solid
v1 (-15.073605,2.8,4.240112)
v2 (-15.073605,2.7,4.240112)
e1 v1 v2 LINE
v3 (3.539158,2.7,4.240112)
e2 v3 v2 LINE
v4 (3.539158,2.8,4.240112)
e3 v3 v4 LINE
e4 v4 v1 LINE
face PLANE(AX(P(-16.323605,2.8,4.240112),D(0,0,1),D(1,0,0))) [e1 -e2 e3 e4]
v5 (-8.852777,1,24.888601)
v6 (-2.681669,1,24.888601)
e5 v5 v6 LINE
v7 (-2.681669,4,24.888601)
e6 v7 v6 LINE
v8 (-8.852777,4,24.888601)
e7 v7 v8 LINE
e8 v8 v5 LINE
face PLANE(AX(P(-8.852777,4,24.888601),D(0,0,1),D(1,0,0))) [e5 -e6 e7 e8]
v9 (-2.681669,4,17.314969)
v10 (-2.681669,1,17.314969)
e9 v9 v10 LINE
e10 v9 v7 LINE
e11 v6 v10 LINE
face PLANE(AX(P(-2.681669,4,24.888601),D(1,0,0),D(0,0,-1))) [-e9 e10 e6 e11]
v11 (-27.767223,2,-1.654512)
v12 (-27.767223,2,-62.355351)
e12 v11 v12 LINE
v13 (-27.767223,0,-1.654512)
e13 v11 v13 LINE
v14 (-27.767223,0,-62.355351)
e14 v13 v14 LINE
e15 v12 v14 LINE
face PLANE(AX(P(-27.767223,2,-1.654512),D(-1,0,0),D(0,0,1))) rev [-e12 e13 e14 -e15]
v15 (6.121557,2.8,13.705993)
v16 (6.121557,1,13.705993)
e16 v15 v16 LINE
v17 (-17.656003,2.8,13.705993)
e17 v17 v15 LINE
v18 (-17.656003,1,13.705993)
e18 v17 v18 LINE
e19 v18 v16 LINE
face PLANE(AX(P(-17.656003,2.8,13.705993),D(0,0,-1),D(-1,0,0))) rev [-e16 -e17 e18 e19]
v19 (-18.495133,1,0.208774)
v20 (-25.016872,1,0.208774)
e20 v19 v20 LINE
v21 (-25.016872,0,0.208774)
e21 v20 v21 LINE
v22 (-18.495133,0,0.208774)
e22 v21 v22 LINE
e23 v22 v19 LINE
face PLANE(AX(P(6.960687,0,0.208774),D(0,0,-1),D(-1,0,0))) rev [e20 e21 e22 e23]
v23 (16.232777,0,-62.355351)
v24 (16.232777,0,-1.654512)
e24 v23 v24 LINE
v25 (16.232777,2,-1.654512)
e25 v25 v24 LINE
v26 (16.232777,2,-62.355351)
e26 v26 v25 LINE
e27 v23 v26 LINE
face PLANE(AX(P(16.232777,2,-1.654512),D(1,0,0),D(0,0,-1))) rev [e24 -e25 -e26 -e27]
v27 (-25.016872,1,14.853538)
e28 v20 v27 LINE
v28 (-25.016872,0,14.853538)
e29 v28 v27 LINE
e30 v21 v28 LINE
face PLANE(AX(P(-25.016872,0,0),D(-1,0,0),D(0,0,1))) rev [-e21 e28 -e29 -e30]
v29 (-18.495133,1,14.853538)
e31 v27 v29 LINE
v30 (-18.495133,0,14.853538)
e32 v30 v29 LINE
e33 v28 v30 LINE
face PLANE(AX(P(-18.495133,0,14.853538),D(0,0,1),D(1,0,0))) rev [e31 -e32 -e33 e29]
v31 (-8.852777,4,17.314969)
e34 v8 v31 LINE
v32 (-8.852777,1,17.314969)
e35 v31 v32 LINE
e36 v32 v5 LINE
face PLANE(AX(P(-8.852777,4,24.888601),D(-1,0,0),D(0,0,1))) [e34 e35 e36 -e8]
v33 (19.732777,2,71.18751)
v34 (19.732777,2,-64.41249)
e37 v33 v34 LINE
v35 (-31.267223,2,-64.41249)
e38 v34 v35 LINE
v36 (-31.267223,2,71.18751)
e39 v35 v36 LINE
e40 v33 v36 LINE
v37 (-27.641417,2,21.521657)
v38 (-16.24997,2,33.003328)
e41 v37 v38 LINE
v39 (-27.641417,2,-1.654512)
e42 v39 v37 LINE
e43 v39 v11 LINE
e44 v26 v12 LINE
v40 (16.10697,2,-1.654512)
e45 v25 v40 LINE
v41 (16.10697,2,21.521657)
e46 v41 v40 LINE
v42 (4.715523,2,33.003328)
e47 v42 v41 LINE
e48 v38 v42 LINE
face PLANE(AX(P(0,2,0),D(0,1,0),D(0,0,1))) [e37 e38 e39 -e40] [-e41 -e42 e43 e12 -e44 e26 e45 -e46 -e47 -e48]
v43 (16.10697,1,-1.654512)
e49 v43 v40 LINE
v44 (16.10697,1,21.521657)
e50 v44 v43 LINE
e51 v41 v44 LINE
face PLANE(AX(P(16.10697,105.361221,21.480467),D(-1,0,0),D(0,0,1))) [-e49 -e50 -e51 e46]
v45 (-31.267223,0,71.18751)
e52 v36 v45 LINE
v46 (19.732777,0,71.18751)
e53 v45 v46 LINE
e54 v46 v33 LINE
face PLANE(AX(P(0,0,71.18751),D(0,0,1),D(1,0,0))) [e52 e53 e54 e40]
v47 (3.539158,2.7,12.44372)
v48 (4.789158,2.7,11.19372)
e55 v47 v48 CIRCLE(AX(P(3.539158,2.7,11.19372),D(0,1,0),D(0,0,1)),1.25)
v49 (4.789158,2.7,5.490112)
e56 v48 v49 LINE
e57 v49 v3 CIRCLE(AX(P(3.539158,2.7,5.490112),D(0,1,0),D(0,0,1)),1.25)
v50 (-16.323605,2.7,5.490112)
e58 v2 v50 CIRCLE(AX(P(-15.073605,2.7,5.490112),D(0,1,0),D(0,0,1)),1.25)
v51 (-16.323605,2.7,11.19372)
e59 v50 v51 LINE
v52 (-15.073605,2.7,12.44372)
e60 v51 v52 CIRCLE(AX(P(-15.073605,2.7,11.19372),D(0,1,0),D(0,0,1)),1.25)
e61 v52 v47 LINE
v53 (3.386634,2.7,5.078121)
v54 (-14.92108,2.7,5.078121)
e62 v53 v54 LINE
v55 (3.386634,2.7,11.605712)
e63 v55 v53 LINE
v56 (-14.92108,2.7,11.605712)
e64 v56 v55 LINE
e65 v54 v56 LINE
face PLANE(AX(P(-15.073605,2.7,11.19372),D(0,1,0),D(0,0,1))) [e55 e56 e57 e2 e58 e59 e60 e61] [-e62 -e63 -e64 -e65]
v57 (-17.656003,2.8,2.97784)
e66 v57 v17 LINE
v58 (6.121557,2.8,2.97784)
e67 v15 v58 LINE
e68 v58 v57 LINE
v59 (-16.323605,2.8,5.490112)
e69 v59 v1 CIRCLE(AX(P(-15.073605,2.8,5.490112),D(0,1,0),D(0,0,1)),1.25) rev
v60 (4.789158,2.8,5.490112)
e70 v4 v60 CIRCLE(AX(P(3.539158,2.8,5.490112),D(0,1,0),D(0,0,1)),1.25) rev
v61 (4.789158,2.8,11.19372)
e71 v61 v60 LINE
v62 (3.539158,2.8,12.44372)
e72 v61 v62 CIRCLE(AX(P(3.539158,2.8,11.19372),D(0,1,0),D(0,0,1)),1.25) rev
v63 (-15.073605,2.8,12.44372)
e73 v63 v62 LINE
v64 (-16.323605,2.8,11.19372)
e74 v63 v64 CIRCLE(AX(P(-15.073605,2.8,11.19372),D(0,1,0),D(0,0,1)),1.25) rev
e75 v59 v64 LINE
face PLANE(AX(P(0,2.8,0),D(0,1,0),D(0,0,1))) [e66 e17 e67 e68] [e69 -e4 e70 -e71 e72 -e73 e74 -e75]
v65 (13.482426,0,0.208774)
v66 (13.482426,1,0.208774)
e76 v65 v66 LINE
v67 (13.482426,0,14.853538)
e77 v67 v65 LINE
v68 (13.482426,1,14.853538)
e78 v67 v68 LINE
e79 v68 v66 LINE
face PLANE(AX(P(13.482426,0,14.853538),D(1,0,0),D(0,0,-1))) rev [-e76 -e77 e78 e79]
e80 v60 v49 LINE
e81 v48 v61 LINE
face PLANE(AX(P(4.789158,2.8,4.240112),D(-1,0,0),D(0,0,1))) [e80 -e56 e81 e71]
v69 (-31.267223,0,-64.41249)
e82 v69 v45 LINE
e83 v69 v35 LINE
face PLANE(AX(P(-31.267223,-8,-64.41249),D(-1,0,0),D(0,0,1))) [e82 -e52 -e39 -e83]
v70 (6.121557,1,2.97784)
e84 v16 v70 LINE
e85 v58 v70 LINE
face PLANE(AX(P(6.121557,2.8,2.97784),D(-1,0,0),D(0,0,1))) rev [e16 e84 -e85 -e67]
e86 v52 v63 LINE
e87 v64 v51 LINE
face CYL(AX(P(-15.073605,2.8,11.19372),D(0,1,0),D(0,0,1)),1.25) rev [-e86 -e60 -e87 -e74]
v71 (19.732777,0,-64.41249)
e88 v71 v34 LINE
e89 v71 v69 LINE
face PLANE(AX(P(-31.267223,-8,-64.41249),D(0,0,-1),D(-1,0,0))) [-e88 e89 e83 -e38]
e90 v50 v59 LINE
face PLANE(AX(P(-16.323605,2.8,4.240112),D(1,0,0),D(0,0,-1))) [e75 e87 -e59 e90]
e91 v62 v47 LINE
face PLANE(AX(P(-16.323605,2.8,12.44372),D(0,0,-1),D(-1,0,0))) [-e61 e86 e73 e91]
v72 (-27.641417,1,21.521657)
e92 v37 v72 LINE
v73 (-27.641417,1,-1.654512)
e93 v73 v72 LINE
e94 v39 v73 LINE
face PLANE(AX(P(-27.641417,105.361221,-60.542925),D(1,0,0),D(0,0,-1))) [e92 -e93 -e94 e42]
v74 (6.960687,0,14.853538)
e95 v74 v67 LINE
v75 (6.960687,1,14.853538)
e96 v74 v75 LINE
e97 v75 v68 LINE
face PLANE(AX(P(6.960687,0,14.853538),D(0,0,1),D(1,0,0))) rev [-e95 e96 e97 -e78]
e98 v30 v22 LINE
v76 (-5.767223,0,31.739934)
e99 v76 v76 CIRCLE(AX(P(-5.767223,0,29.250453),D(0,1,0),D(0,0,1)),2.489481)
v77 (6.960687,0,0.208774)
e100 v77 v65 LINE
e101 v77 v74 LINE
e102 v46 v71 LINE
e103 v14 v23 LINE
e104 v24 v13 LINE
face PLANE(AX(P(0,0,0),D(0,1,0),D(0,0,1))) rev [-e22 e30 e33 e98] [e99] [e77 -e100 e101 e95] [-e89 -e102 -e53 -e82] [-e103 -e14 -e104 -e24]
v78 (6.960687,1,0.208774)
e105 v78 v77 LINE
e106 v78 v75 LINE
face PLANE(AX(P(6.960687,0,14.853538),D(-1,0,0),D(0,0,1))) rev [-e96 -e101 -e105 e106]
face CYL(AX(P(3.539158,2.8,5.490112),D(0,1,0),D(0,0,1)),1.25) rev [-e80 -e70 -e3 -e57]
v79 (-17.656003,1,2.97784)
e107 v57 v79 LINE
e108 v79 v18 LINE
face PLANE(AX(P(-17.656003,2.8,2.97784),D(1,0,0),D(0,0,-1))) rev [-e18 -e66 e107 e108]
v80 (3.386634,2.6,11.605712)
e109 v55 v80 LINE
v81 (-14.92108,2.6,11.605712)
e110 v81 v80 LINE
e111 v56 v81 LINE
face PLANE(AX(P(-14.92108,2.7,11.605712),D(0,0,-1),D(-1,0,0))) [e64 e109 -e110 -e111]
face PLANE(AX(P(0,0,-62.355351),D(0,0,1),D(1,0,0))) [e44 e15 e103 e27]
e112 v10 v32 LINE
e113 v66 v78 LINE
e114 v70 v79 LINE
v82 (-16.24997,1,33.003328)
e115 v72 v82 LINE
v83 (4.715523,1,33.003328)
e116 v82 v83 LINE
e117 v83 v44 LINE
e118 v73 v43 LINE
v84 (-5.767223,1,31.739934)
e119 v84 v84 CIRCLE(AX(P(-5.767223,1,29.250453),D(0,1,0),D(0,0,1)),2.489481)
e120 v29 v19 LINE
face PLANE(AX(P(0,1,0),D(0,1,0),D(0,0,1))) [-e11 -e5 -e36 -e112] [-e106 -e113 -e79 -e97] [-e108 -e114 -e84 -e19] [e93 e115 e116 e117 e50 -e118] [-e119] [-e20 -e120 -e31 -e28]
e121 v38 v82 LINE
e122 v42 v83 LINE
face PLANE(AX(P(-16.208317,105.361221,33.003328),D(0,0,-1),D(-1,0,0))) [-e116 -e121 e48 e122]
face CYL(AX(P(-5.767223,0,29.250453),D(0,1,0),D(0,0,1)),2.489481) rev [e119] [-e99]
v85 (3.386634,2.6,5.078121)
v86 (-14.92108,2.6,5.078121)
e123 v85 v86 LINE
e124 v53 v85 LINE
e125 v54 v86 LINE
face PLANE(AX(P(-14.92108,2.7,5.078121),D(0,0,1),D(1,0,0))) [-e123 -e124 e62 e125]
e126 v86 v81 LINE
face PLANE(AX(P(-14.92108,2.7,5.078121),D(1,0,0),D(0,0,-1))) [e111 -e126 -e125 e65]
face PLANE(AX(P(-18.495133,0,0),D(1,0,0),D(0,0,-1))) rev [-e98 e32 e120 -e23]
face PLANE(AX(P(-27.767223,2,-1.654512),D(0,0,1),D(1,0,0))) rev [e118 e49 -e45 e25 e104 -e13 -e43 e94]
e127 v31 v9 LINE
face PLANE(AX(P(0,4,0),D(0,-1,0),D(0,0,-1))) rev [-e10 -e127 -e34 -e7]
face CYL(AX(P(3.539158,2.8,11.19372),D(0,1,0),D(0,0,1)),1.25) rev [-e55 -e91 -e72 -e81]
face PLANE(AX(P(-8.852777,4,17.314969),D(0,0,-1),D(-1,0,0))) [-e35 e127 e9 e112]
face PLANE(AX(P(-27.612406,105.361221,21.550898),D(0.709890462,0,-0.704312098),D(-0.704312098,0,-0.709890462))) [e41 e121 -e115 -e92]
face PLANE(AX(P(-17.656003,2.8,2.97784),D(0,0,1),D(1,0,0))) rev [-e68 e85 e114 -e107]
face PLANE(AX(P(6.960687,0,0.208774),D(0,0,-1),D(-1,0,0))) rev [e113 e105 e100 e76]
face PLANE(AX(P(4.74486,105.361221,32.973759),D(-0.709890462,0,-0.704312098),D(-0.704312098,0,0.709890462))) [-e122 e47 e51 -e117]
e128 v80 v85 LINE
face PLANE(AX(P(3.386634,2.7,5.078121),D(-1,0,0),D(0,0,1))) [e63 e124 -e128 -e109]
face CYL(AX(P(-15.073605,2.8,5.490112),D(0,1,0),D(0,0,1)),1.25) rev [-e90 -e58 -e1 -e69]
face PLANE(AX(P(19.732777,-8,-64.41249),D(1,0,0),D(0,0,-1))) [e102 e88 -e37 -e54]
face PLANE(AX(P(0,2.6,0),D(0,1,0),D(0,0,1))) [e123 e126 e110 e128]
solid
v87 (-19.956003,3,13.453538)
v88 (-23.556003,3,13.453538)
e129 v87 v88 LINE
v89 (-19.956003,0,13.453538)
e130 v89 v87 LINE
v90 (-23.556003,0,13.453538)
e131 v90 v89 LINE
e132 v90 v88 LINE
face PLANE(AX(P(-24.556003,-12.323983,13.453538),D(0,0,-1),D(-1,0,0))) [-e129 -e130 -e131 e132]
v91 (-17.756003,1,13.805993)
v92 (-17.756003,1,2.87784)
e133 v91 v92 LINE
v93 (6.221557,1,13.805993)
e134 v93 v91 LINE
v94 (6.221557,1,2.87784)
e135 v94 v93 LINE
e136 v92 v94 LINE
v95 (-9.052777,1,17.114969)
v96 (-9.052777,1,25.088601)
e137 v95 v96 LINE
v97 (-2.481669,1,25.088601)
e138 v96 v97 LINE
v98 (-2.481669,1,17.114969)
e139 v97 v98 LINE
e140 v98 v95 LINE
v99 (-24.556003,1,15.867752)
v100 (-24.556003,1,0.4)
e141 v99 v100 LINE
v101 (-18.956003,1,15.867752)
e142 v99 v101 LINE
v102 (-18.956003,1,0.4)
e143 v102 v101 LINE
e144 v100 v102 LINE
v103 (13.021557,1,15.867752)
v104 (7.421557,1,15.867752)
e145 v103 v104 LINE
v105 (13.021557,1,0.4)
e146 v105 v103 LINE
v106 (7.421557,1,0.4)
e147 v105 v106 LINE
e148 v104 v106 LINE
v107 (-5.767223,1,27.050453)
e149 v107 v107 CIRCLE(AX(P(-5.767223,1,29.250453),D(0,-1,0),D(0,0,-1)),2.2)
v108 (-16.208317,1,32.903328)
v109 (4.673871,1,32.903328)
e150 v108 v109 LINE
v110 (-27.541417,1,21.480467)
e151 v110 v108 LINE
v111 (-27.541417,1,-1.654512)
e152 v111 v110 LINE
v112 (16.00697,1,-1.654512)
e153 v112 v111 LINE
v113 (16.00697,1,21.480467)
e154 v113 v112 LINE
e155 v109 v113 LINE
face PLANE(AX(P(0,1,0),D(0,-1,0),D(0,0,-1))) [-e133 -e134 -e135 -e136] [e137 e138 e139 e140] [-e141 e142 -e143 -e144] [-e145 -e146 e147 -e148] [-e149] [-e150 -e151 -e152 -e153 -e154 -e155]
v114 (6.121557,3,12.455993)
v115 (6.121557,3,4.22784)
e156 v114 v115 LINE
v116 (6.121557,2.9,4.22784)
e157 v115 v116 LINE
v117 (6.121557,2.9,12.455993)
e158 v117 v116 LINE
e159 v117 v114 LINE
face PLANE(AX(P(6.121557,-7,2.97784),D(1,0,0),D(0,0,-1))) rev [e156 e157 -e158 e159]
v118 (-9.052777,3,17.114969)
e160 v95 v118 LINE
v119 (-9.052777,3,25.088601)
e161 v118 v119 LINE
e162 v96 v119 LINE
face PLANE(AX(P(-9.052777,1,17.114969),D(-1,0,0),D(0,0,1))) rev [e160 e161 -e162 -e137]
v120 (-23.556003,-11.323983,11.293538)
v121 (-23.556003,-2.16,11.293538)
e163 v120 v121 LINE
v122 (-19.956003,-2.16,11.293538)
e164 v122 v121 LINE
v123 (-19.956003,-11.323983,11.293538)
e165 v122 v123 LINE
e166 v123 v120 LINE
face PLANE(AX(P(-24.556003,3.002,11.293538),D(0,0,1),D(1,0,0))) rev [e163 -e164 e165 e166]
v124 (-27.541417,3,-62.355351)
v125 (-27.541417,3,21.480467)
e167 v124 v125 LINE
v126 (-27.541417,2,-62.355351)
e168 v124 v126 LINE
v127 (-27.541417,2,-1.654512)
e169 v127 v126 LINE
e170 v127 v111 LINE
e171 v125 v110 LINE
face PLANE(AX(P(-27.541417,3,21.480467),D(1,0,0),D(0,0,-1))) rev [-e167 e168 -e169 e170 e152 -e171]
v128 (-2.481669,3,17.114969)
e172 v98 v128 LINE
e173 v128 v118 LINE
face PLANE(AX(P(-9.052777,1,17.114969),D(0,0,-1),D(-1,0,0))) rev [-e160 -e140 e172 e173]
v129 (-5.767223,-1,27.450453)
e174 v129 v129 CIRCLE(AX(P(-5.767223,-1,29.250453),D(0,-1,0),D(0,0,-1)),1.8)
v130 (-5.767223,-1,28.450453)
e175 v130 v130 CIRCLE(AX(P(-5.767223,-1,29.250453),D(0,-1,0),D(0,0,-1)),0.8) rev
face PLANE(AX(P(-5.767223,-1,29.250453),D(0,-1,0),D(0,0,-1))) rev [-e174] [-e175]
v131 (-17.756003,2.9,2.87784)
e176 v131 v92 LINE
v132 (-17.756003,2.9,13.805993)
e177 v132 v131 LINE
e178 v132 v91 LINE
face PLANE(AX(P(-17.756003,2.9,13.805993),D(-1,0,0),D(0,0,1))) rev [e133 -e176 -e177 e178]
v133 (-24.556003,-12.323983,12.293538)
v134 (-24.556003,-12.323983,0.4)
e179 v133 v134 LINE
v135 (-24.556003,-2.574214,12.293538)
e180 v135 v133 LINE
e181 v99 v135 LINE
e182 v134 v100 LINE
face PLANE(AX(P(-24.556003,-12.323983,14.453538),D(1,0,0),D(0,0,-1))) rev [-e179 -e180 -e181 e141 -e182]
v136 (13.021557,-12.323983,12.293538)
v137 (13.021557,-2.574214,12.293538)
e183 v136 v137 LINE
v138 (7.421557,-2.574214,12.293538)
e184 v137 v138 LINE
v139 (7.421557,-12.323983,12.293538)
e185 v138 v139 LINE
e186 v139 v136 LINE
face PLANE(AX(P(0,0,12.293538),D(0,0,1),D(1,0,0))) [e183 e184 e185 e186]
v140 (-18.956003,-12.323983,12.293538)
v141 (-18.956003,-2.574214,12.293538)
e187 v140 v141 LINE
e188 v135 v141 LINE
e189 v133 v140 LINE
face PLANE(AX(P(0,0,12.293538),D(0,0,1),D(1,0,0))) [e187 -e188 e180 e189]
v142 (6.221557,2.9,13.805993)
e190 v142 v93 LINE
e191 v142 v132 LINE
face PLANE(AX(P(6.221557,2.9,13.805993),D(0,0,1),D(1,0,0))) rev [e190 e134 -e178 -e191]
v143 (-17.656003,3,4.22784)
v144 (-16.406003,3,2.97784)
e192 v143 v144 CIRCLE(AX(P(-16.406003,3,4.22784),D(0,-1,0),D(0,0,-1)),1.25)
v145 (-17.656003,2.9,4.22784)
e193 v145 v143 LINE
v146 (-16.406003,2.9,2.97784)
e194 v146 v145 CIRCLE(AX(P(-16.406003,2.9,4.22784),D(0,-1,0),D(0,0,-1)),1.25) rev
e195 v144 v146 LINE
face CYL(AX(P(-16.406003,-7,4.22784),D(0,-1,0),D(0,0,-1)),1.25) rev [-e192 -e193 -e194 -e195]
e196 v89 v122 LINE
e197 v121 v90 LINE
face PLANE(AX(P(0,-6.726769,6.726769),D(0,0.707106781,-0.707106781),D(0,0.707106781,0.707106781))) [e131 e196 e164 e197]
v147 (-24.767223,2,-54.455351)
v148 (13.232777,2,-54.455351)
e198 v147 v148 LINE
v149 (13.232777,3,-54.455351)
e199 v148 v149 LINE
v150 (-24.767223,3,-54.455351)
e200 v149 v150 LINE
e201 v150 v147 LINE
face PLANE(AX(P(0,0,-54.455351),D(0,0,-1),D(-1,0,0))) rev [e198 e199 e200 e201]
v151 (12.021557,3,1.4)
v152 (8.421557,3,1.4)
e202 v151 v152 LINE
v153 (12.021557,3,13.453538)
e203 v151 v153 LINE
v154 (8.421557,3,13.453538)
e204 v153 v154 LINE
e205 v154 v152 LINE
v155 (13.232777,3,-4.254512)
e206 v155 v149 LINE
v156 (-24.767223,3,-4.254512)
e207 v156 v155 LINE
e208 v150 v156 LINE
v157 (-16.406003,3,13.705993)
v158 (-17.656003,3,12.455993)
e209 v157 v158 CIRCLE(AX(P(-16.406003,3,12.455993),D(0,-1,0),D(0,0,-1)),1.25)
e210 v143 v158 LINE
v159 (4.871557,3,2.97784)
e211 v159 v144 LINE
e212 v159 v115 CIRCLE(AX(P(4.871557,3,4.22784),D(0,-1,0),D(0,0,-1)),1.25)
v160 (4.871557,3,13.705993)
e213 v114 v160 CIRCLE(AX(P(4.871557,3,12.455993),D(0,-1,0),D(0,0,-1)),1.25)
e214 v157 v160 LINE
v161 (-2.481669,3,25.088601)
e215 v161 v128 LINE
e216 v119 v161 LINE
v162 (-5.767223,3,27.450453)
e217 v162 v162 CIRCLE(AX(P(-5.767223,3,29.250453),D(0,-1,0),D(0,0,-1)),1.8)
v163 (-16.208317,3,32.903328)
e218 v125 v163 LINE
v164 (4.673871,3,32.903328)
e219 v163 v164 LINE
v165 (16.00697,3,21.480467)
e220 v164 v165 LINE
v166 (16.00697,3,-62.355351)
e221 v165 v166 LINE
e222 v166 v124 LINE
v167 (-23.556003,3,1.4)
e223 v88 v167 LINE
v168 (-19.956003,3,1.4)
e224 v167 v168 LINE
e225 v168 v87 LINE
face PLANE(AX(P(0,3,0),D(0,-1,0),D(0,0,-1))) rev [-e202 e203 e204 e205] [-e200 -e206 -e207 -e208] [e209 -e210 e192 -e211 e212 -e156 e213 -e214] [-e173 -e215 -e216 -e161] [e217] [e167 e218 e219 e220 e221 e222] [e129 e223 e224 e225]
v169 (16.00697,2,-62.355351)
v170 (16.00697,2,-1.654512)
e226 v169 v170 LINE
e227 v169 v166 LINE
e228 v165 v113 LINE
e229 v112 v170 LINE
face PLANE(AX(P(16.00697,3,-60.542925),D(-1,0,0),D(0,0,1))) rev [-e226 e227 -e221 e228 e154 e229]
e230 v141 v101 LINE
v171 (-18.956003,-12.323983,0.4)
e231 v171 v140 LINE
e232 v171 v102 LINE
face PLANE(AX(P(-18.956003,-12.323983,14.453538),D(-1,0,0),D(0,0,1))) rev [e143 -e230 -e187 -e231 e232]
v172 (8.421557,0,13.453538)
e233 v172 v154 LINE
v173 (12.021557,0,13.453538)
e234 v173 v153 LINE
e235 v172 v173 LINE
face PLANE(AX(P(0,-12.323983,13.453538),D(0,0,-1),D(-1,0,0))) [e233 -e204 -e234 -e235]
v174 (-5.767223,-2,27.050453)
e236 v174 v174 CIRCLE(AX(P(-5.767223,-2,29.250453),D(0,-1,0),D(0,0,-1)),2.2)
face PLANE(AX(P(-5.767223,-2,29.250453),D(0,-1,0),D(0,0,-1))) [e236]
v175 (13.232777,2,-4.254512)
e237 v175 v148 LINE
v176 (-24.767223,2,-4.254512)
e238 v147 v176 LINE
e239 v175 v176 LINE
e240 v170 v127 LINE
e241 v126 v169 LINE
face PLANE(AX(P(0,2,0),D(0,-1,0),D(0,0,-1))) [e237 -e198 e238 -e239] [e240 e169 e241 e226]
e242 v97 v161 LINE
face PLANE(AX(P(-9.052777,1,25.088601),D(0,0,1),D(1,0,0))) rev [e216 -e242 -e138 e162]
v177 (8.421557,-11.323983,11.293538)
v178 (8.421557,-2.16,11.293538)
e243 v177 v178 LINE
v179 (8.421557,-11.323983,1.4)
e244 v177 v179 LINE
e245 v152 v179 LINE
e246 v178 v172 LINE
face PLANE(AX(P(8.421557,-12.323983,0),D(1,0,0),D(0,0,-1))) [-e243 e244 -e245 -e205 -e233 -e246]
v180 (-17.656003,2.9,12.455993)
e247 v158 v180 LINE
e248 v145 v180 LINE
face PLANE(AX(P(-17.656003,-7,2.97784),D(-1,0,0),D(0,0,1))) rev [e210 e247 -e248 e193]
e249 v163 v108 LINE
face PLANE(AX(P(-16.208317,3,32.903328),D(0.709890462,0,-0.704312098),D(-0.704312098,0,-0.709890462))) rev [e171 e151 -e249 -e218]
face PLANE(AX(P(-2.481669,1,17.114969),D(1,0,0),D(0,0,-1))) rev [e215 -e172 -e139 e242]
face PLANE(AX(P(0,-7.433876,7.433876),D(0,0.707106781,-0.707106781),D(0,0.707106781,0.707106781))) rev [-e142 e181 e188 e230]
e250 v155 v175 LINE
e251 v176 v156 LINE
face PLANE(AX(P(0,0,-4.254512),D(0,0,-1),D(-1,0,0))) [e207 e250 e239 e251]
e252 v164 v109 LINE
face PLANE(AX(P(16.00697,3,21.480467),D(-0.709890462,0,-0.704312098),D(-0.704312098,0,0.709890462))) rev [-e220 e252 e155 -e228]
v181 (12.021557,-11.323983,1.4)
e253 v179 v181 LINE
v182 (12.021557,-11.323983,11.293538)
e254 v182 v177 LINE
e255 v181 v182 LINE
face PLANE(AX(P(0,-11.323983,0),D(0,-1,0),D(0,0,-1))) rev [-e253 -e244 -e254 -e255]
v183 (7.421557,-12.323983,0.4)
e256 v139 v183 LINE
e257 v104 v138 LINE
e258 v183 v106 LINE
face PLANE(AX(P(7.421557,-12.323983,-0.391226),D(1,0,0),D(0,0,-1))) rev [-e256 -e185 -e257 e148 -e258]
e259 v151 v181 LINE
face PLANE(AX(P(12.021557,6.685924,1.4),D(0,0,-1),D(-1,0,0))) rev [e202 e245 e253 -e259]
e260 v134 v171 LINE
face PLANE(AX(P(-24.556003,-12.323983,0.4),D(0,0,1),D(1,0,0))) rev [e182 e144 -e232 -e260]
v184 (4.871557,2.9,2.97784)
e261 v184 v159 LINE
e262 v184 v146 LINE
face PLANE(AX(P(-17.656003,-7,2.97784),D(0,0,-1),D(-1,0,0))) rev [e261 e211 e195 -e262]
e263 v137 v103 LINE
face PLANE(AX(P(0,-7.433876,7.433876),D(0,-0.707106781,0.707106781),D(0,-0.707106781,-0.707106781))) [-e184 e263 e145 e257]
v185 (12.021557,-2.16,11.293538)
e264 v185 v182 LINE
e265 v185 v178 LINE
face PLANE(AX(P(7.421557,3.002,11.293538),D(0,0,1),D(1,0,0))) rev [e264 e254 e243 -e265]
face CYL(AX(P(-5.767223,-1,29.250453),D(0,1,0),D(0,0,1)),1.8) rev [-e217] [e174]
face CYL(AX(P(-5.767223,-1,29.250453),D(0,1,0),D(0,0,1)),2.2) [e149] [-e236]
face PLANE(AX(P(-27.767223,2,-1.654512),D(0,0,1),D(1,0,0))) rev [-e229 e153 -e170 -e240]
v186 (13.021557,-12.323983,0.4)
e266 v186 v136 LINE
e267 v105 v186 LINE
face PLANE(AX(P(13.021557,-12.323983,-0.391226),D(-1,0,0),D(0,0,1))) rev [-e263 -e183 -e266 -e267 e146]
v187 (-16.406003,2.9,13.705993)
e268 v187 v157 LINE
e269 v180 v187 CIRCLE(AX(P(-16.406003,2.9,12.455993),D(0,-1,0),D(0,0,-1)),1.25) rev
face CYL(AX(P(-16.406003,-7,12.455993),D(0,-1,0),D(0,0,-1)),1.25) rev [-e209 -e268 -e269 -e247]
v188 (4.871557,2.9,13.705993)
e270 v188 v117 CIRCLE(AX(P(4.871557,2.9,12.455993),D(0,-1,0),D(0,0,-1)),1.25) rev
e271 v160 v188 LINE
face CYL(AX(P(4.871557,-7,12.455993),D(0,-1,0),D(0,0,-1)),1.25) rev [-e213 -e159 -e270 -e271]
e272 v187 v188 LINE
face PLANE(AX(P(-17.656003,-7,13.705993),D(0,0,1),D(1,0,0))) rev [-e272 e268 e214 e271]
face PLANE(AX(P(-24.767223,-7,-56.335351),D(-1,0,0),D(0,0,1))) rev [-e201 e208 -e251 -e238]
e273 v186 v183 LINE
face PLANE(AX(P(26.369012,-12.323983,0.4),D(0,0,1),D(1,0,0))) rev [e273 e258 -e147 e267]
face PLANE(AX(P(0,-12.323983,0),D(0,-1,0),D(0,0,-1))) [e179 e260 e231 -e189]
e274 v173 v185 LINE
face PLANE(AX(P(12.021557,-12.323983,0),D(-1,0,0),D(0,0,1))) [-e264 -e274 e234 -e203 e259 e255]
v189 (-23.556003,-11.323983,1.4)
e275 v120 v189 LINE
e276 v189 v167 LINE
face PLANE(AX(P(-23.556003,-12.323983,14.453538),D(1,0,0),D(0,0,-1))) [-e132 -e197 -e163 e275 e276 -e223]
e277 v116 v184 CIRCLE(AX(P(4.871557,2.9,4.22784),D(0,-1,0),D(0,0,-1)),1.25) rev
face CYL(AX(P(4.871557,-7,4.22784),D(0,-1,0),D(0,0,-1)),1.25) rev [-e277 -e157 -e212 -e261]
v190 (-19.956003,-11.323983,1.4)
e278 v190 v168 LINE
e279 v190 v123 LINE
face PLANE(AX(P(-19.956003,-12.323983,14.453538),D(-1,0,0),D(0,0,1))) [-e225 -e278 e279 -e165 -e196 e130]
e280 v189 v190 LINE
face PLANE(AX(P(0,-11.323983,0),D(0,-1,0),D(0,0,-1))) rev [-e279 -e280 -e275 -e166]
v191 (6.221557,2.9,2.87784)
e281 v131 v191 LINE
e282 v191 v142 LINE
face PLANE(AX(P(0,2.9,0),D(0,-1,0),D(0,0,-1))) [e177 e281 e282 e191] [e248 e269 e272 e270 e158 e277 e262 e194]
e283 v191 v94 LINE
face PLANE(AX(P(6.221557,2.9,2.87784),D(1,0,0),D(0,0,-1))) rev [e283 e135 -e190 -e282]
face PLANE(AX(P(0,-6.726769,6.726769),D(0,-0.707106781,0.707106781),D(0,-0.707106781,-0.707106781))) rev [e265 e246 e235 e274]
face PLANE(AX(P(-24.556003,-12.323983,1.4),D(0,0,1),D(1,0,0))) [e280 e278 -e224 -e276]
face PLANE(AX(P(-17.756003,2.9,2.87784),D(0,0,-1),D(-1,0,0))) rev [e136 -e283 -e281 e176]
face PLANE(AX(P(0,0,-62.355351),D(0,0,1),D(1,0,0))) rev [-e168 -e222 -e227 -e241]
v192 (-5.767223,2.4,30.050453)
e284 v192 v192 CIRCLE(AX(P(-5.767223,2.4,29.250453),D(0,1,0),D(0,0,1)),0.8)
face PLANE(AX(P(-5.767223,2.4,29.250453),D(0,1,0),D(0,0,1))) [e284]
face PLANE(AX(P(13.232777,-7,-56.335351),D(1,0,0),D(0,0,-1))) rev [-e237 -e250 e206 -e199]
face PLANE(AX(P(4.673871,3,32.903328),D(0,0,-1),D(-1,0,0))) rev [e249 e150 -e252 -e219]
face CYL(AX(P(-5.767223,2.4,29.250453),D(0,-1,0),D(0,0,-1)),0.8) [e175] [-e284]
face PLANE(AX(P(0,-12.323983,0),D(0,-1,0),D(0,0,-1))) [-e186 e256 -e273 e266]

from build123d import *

# Parameters (mm, degrees)
SKETCH1_W                   = 51.332398317
SKETCH1_H                   = 136.325385694
BOSS_EXTRUDE1_DEPTH         = 2
CUT_EXTRUDE1_DEPTH          = 1
SKETCH3_W                   = 26.718092566
SKETCH3_H                   = 51.160838605
CUT_EXTRUDE2_DEPTH          = 1
SKETCH4_W                   = 20.659186536
SKETCH4_H                   = 13.604488078
BOSS_EXTRUDE2_DEPTH         = 1
SKETCH5_W                   = 6.521739131
SKETCH5_H                   = 14.853538096
SKETCH5_W_2                 = 6.52173913
SKETCH5_H_2                 = 15.644764374
CUT_EXTRUDE3_DEPTH          = 1
SKETCH6_W                   = 6.171107994
SKETCH6_H                   = 7.573632539
CUT_EXTRUDE4_DEPTH          = 1
SKETCH7_R                   = 2.489481066
CUT_EXTRUDE5_DEPTH          = 1
BOSS_EXTRUDE3_DEPTH         = 1
SKETCH10_W                  = 6.171107994
SKETCH10_H                  = 7.573632539
BOSS_EXTRUDE4_DEPTH         = 4
BOSS_EXTRUDE5_DEPTH         = 2
SKETCH12_W                  = 6.571107994
SKETCH12_H                  = 7.973632539
CUT_EXTRUDE6_DEPTH          = 2
SKETCH13_R                  = 1.8
SKETCH13_W                  = 26.718092566
SKETCH13_H                  = 51.160838605
CUT_EXTRUDE9_DEPTH          = 2
SKETCH14_R                  = 2.2
SKETCH14_R_2                = 1.8
BOSS_EXTRUDE11_DEPTH        = 2
SKETCH17_R                  = 2.2
BOSS_EXTRUDE12_DEPTH        = 1
SKETCH18_R                  = 0.8
BOSS_EXTRUDE15_DEPTH        = 3.4
EXTRUDE_THIN3_OUTLINE_W     = 5.6
EXTRUDE_THIN3_OUTLINE_H     = 14.844764374
EXTRUDE_THIN3_OUTLINE_W_2   = 3.6
EXTRUDE_THIN3_OUTLINE_H_2   = 12.844764374
EXTRUDE_THIN3_DEPTH         = 13.32398317
EXTRUDE_THIN3_2_OUTLINE_W   = 5.6
EXTRUDE_THIN3_2_OUTLINE_H   = 14.053538096
EXTRUDE_THIN3_2_OUTLINE_W_2 = 3.6
EXTRUDE_THIN3_2_OUTLINE_H_2 = 12.053538096
EXTRUDE_THIN3_2_DEPTH       = 13.32398317
SKETCH26_W                  = 3.6
SKETCH26_H                  = 12.053538096
SKETCH26_H_2                = 12.844764374
CUT_EXTRUDE12_DEPTH         = 13.32398317
SKETCH27_W                  = 5.6
SKETCH27_H                  = 14.053538096
BOSS_EXTRUDE18_DEPTH        = 1
SKETCH27_W_2                = 5.570395019
SKETCH27_H_2                = 14.844764374
BOSS_EXTRUDE18_2_DEPTH      = 1
SKETCH28_W                  = 20.659186536
SKETCH28_H                  = 13.604488078
CUT_EXTRUDE13_DEPTH         = 1
SKETCH29_W                  = 23.777559608
SKETCH29_H                  = 10.728152402
CUT_EXTRUDE15_DEPTH         = 10
SKETCH30_W                  = 23.777559608
SKETCH30_H                  = 10.728152402
SKETCH30_W_2                = 21.112762974
SKETCH30_H_2                = 8.203608222
BOSS_EXTRUDE20_DEPTH        = 1.8
SKETCH31_W                  = 21.112762974
SKETCH31_H                  = 8.203608222
BOSS_EXTRUDE21_DEPTH        = 1.6
SKETCH35_W                  = 23.977559608
SKETCH35_H                  = 10.928152402
CUT_EXTRUDE21_DEPTH         = 1.9
FILLET2_R                   = 1.25
FILLET3_R                   = 1.25
SKETCH37_W                  = 18.307713885
SKETCH37_H                  = 6.527591392
CUT_EXTRUDE22_DEPTH         = 0.1
SKETCH41_W                  = 18.307713885
SKETCH41_H                  = 6.527591392
BOSS_EXTRUDE27_DEPTH        = 0.1
SKETCH43_W                  = 18.307713885
SKETCH43_H                  = 6.527591392
BOSS_EXTRUDE28_DEPTH        = 0.1
CUT_EXTRUDE24_DEPTH         = 40.1
SKETCH51_W                  = 5.6
SKETCH51_H                  = 4.468914857
BOSS_EXTRUDE29_DEPTH        = 1
BOSS_EXTRUDE29_2_DEPTH      = 1
SKETCH52_W                  = 5.6
SKETCH52_H                  = 1
BOSS_EXTRUDE30_DEPTH        = 2.5
BOSS_EXTRUDE30_2_DEPTH      = 2.5
SKETCH53_W                  = 5.6
SKETCH53_H                  = 1
BOSS_EXTRUDE31_DEPTH        = 1
BOSS_EXTRUDE32_START        = 7.421556697
BOSS_EXTRUDE32_DEPTH        = 5.6
BOSS_EXTRUDE32_START_2      = -24.556002911
BOSS_EXTRUDE32_2_DEPTH      = 5.6
SKETCH55_W                  = 3.6
SKETCH55_H                  = 0.791226278
BOSS_EXTRUDE33_DEPTH        = 14.323983
SKETCH56_W                  = 0.791226278
SKETCH56_H                  = 13.32398317
CUT_EXTRUDE25_DEPTH         = 5.6
CUT_EXTRUDE_THIN1_DEPTH     = 1
SKETCH59_W                  = 71.33
SKETCH59_H                  = 156.33
SKETCH59_W_2                = 51.33
SKETCH59_H_2                = 136.33
CUT_EXTRUDE_THIN2_DEPTH     = 10
SKETCH60_W                  = 71
SKETCH60_H                  = 156
SKETCH60_W_2                = 51
SKETCH60_H_2                = 136
CUT_EXTRUDE_THIN3_DEPTH     = 10
SKETCH61_W                  = 51
SKETCH61_H                  = 2
CUT_EXTRUDE26_DEPTH         = 0.4
SKETCH62_W                  = 38
SKETCH62_H                  = 51.160838605
CUT_EXTRUDE28_DEPTH         = 10
SKETCH64_W                  = 38
SKETCH64_H                  = 0.08
BOSS_EXTRUDE35_DEPTH        = 2
SKETCH65_W                  = 38
SKETCH65_H                  = 0.08
BOSS_EXTRUDE37_DEPTH        = 1
SKETCH67_W                  = 44
SKETCH67_H                  = 61.400838605
CUT_EXTRUDE31_DEPTH         = 2
SKETCH69_W                  = 40.716981818
SKETCH69_H                  = 1
BOSS_EXTRUDE39_DEPTH        = 1.863286117
SKETCH70_W                  = 44
SKETCH70_H                  = 2
BOSS_EXTRUDE40_DEPTH        = 1
SKETCH71_W                  = 38
SKETCH71_H                  = 1
CUT_EXTRUDE32_DEPTH         = 1
SKETCH72_W                  = 38
SKETCH72_H                  = 1
BOSS_EXTRUDE41_DEPTH        = 1.8
SKETCH73_W                  = 44
SKETCH73_H                  = 2
CUT_EXTRUDE33_DEPTH         = 0.3
SKETCH74_W                  = 43.548387097
SKETCH74_H                  = 1
BOSS_EXTRUDE43_DEPTH        = 1.812426367


with BuildPart() as part:
    # Sketch1 → Boss-Extrude1 (new body)
    with BuildSketch(Plane(origin=(0, 0, 0), x_dir=(1, 0, 0), z_dir=(0, 1, 0))):
        with Locations((-5.767223106, -3.58751015)):
            Rectangle(SKETCH1_W, SKETCH1_H)
    extrude(amount=BOSS_EXTRUDE1_DEPTH)

    # Sketch2 → Cut-Extrude1 (cut)
    with BuildSketch(Plane(origin=(0, 2, 0), x_dir=(1, 0, 0), z_dir=(0, 1, 0))):
        Polygon((-27.541416655, -30.445855171), (-27.541416655, 60.542924633), (16.006970442, 60.542924633), (16.006970442, -30.445855171), (4.678976052, -41.666051524), (-16.213422265, -41.666051524), align=None)
    extrude(amount=-CUT_EXTRUDE1_DEPTH, mode=Mode.SUBTRACT)

    # Sketch3 → Cut-Extrude2 (cut)
    with BuildSketch(Plane(origin=(0, 1, 0), x_dir=(1, 0, 0), z_dir=(0, 1, 0))):
        with Locations((-5.767223107, 30.754931698)):
            Rectangle(SKETCH3_W, SKETCH3_H)
    extrude(amount=-CUT_EXTRUDE2_DEPTH, mode=Mode.SUBTRACT)

    # Sketch4 → Boss-Extrude2 (add)
    with BuildSketch(Plane(origin=(0, 1, 0), x_dir=(1, 0, 0), z_dir=(0, 1, 0))):
        with Locations((-5.767223107, -7.988180452)):
            Rectangle(SKETCH4_W, SKETCH4_H)
    extrude(amount=BOSS_EXTRUDE2_DEPTH)

    # Sketch5 → Cut-Extrude3 (cut)
    with BuildSketch(Plane(origin=(0, 1, 0), x_dir=(1, 0, 0), z_dir=(0, 1, 0))):
        with Locations((-21.756002911, -7.426769048)):
            Rectangle(SKETCH5_W, SKETCH5_H)
        with Locations((10.221556697, -7.031155909)):
            Rectangle(SKETCH5_W_2, SKETCH5_H_2)
    extrude(amount=-CUT_EXTRUDE3_DEPTH, mode=Mode.SUBTRACT)

    # Sketch6 → Cut-Extrude4 (cut)
    with BuildSketch(Plane(origin=(0, 1, 0), x_dir=(1, 0, 0), z_dir=(0, 1, 0))):
        with Locations((-5.767223107, -21.101784941)):
            Rectangle(SKETCH6_W, SKETCH6_H)
    extrude(amount=-CUT_EXTRUDE4_DEPTH, mode=Mode.SUBTRACT)

    # Sketch7 → Cut-Extrude5 (cut)
    with BuildSketch(Plane(origin=(0, 1, 0), x_dir=(1, 0, 0), z_dir=(0, 1, 0))):
        with Locations(Location((-5.767223107, -29.250452542, 0), (0, 0, 270))):
            Circle(SKETCH7_R)
    extrude(amount=-CUT_EXTRUDE5_DEPTH, mode=Mode.SUBTRACT)

    # Sketch8 → Boss-Extrude3 (add)
    with BuildSketch(Plane(origin=(0, 1, 0), x_dir=(1, 0, 0), z_dir=(0, 1, 0))):
        Polygon((-27.541416655, -21.480466567), (-27.541416655, -30.445855171), (-16.213422265, -41.666051524), (4.678976052, -41.666051524), (16.006970442, -30.445855171), (16.006970442, -21.480466567), (4.673870862, -32.903327717), (-16.208317076, -32.903327717), align=None)
    extrude(amount=BOSS_EXTRUDE3_DEPTH)

    # Sketch10 → Boss-Extrude4 (add)
    with BuildSketch(Plane.XZ):
        with Locations((-5.767223107, 21.101784941)):
            Rectangle(SKETCH10_W, SKETCH10_H)
    extrude(amount=-BOSS_EXTRUDE4_DEPTH)

    # Sketch28 → Cut-Extrude13 (cut)
    with BuildSketch(Plane(origin=(0, 2, 0), x_dir=(1, 0, 0), z_dir=(0, 1, 0))):
        with Locations((-5.767223107, -7.988180452)):
            Rectangle(SKETCH28_W, SKETCH28_H)
    extrude(amount=-CUT_EXTRUDE13_DEPTH, mode=Mode.SUBTRACT)


with BuildPart() as body_2:
    # Sketch11 → Boss-Extrude5 (new body)
    with BuildSketch(Plane(origin=(0, 1, 0), x_dir=(1, 0, 0), z_dir=(0, 1, 0))):
        Polygon((-27.541416655, 60.542924633), (16.006970442, 60.542924633), (16.006970442, -21.480466567), (4.673870862, -32.903327717), (-16.208317076, -32.903327717), (-27.541416655, -21.480466567), align=None)
    extrude(amount=BOSS_EXTRUDE5_DEPTH)

    # Sketch12 → Cut-Extrude6 (cut)
    with BuildSketch(Plane(origin=(0, 3, 0), x_dir=(1, 0, 0), z_dir=(0, 1, 0))):
        with Locations((-5.767223107, -21.10178494)):
            Rectangle(SKETCH12_W, SKETCH12_H)
    extrude(amount=-CUT_EXTRUDE6_DEPTH, mode=Mode.SUBTRACT)

    # Sketch13 → Cut-Extrude9 (cut)
    with BuildSketch(Plane.XZ.offset(-1)):
        with Locations(Location((-5.767223107, 29.250452542, 0), (0, 0, 270))):
            Circle(SKETCH13_R)
        with Locations((-5.767223107, -30.754931698)):
            Rectangle(SKETCH13_W, SKETCH13_H)
    extrude(amount=-CUT_EXTRUDE9_DEPTH, mode=Mode.SUBTRACT)


with BuildPart() as body_3:
    # Sketch14 → Boss-Extrude11 (new body)
    with BuildSketch(Plane.XZ.offset(-1)):
        with Locations(Location((-5.767223107, 29.250452542, 0), (0, 0, 270))):
            Circle(SKETCH14_R)
        with Locations(Location((-5.767223107, 29.250452542, 0), (0, 0, 270))):
            Circle(SKETCH14_R_2, mode=Mode.SUBTRACT)
    extrude(amount=BOSS_EXTRUDE11_DEPTH)

    # Combine1: union body 2
    add(body_2.part)

    # Sketch17 → Boss-Extrude12 (add)
    with BuildSketch(Plane.XZ.offset(1)):
        with Locations(Location((-5.767223107, 29.250452542, 0), (0, 0, 270))):
            Circle(SKETCH17_R)
    extrude(amount=BOSS_EXTRUDE12_DEPTH)


with BuildPart() as body_3_2:
    # Sketch18 → Boss-Extrude15 (new body)
    with BuildSketch(Plane(origin=(0, -1, 0), x_dir=(1, 0, 0), z_dir=(0, 1, 0))):
        with Locations(Location((-5.767223107, -29.250452542, 0), (0, 0, 270))):
            Circle(SKETCH18_R)
    extrude(amount=BOSS_EXTRUDE15_DEPTH)


with BuildPart() as body_3_1:
    add(body_3.part)

    # Combine3: union body 3 2
    add(body_3_2.part)

    # Sketch26 → Cut-Extrude12 (cut)
    with BuildSketch(Plane.XZ.offset(-1)):
        with Locations((-21.756002911, 7.426769048)):
            Rectangle(SKETCH26_W, SKETCH26_H)
        with Locations((10.221556697, 7.031155909)):
            Rectangle(SKETCH26_W, SKETCH26_H_2)
    extrude(amount=-CUT_EXTRUDE12_DEPTH, mode=Mode.SUBTRACT)


with BuildPart() as body_3_3:
    # Extrude-Thin3: read off the stored shape, not the designer's step
    # Extrude-Thin3 outline → Extrude-Thin3 (new body)
    with BuildSketch(Plane.XZ.offset(-1)):
        with Locations((10.221556697, 7.031155909)):
            Rectangle(EXTRUDE_THIN3_OUTLINE_W, EXTRUDE_THIN3_OUTLINE_H)
        with Locations((10.221556697, 7.031155909)):
            Rectangle(EXTRUDE_THIN3_OUTLINE_W_2, EXTRUDE_THIN3_OUTLINE_H_2, mode=Mode.SUBTRACT)
    extrude(amount=EXTRUDE_THIN3_DEPTH)


with BuildPart() as body_4:
    # Extrude-Thin3 2 outline → Extrude-Thin3 2 (new body)
    with BuildSketch(Plane.XZ.offset(-1)):
        with Locations((-21.756002911, 7.426769048)):
            Rectangle(EXTRUDE_THIN3_2_OUTLINE_W, EXTRUDE_THIN3_2_OUTLINE_H)
        with Locations((-21.756002911, 7.426769048)):
            Rectangle(EXTRUDE_THIN3_2_OUTLINE_W_2, EXTRUDE_THIN3_2_OUTLINE_H_2, mode=Mode.SUBTRACT)
    extrude(amount=EXTRUDE_THIN3_2_DEPTH)


with BuildPart() as body_5:
    # Sketch27 → Boss-Extrude18 (new body)
    with BuildSketch(Plane.XZ.offset(12.32398317)):
        with Locations((-21.756002911, 7.426769048)):
            Rectangle(SKETCH27_W, SKETCH27_H)
    extrude(amount=-BOSS_EXTRUDE18_DEPTH)


with BuildPart() as body_6:
    # Sketch27 → Boss-Extrude18 2 (new body)
    with BuildSketch(Plane.XZ.offset(12.32398317)):
        with Locations((10.206754207, 7.031155909)):
            Rectangle(SKETCH27_W_2, SKETCH27_H_2)
    extrude(amount=-BOSS_EXTRUDE18_2_DEPTH)


with BuildPart() as body_4_1:
    add(body_4.part)

    # Combine4: union body 3 3, body 3, body 5, body 6
    add(body_3_3.part)
    add(body_3_1.part)
    add(body_5.part)
    add(body_6.part)

    # Sketch29 → Cut-Extrude15 (cut)
    with BuildSketch(Plane(origin=(0, 3, 0), x_dir=(1, 0, 0), z_dir=(0, 1, 0))):
        with Locations((-5.767223107, -8.341916313)):
            Rectangle(SKETCH29_W, SKETCH29_H)
    extrude(amount=-CUT_EXTRUDE15_DEPTH, mode=Mode.SUBTRACT)

    # Sketch35 → Cut-Extrude21 (cut)
    with BuildSketch(Plane.XZ.offset(-1)):
        with Locations((-5.767223107, 8.341916313)):
            Rectangle(SKETCH35_W, SKETCH35_H)
    extrude(amount=-CUT_EXTRUDE21_DEPTH, mode=Mode.SUBTRACT)

    # Fillet2
    fillet2_edges = [body_4_1.edges().sort_by_distance(p)[0] for p in [
        (-17.656002911, 2.95, 13.705992514),
        (6.121556697, 2.95, 13.705992514),
        (6.121556697, 2.95, 2.977840112),
        (-17.656002911, 2.95, 2.977840112),
    ]]
    fillet(fillet2_edges, radius=FILLET2_R)

    # Sketch50 → Cut-Extrude24 (cut)
    with BuildSketch(Plane(origin=(13.021556697, 0, 0), x_dir=(0, 0, -1), z_dir=(1, 0, 0))):
        Polygon((-14.453538096, 1), (-11.293538096, -2.16), (-11.293538096, -12.32398317), (-14.453538096, -12.32398317), align=None)
    extrude(amount=-CUT_EXTRUDE24_DEPTH, mode=Mode.SUBTRACT)


with BuildPart() as body_3_4:
    # Sketch30 → Boss-Extrude20 (new body)
    with BuildSketch(Plane(origin=(0, 1, 0), x_dir=(1, 0, 0), z_dir=(0, 1, 0))):
        with Locations((-5.767223107, -8.341916313)):
            Rectangle(SKETCH30_W, SKETCH30_H)
        with Locations((-5.767223107, -8.341916313)):
            Rectangle(SKETCH30_W_2, SKETCH30_H_2, mode=Mode.SUBTRACT)
    extrude(amount=BOSS_EXTRUDE20_DEPTH)


with BuildPart() as body_4_2:
    # Sketch31 → Boss-Extrude21 (new body)
    with BuildSketch(Plane(origin=(0, 1, 0), x_dir=(1, 0, 0), z_dir=(0, 1, 0))):
        with Locations((-5.767223107, -8.341916313)):
            Rectangle(SKETCH31_W, SKETCH31_H)
    extrude(amount=BOSS_EXTRUDE21_DEPTH)


with BuildPart() as part_1:
    add(part.part)

    # Combine5: union body 3 4, body 4 2
    add(body_3_4.part)
    add(body_4_2.part)

    # Fillet3
    fillet3_edges = [part_1.edges().sort_by_distance(p)[0] for p in [
        (-16.323604594, 2.7, 12.443720424),
        (4.78915838, 2.7, 12.443720424),
        (4.78915838, 2.7, 4.240112202),
        (-16.323604594, 2.7, 4.240112202),
    ]]
    fillet(fillet3_edges, radius=FILLET3_R)

    # Sketch37 → Cut-Extrude22 (cut)
    with BuildSketch(Plane(origin=(0, 2.6, 0), x_dir=(1, 0, 0), z_dir=(0, 1, 0))):
        with Locations((-5.767223107, -8.341916313)):
            Rectangle(SKETCH37_W, SKETCH37_H)
    extrude(amount=-CUT_EXTRUDE22_DEPTH, mode=Mode.SUBTRACT)


with BuildPart() as body_3_5:
    # Sketch41 → Boss-Extrude27 (new body)
    with BuildSketch(Plane(origin=(0, 2.6, 0), x_dir=(1, 0, 0), z_dir=(0, 1, 0))):
        with BuildLine():
            Line((-15.073604594, -12.443720424), (3.53915838, -12.443720424))
            ThreePointArc((3.53915838, -12.443720424), (4.423041856, -12.077603901), (4.78915838, -11.193720424))
            Line((4.78915838, -11.193720424), (4.78915838, -5.490112202))
            ThreePointArc((4.78915838, -5.490112202), (4.423041856, -4.606228725), (3.53915838, -4.240112202))
            Line((3.53915838, -4.240112202), (-15.073604594, -4.240112202))
            ThreePointArc((-15.073604594, -4.240112202), (-15.95748807, -4.606228725), (-16.323604594, -5.490112202))
            Line((-16.323604594, -5.490112202), (-16.323604594, -11.193720424))
            ThreePointArc((-16.323604594, -11.193720424), (-15.95748807, -12.077603901), (-15.073604594, -12.443720424))
        make_face()
        with Locations((-5.767223107, -8.341916313)):
            Rectangle(SKETCH41_W, SKETCH41_H, mode=Mode.SUBTRACT)
    extrude(amount=BOSS_EXTRUDE27_DEPTH)

    # Combine6: union part
    add(part_1.part)


with BuildPart() as body_3_6:
    # Sketch43 → Boss-Extrude28 (new body)
    with BuildSketch(Plane(origin=(0, 2.5, 0), x_dir=(1, 0, 0), z_dir=(0, 1, 0))):
        with Locations((-5.767223107, -8.341916313)):
            Rectangle(SKETCH43_W, SKETCH43_H)
    extrude(amount=BOSS_EXTRUDE28_DEPTH)

    # Combine7: union body 3 5
    add(body_3_5.part)

    # Sketch58 → Cut-Extrude-Thin1 (cut)
    with BuildSketch(Plane(origin=(0, 1, 0), x_dir=(1, 0, 0), z_dir=(0, 1, 0))):
        Polygon((-16.249969686, -33.003327717), (4.715523472, -33.003327717), (16.106970442, -21.521657048), (16.106970442, 60.642924633), (-27.641416655, 60.642924633), (-27.641416655, -21.521657048), align=None)
        Polygon((-16.208317076, -32.903327717), (4.673870862, -32.903327717), (16.006970442, -21.480466567), (16.006970442, 60.542924633), (-27.541416655, 60.542924633), (-27.541416655, -21.480466567), align=None, mode=Mode.SUBTRACT)
    extrude(amount=CUT_EXTRUDE_THIN1_DEPTH, mode=Mode.SUBTRACT)

    # Sketch59 → Cut-Extrude-Thin2 (cut)
    with BuildSketch(Plane(origin=(0, 2, 0), x_dir=(1, 0, 0), z_dir=(0, 1, 0))):
        with Locations((-5.767223107, -3.58751015)):
            Rectangle(SKETCH59_W, SKETCH59_H)
        with Locations((-5.767223107, -3.58751015)):
            Rectangle(SKETCH59_W_2, SKETCH59_H_2, mode=Mode.SUBTRACT)
    extrude(amount=-CUT_EXTRUDE_THIN2_DEPTH, mode=Mode.SUBTRACT)

    # Sketch60 → Cut-Extrude-Thin3 (cut)
    with BuildSketch(Plane(origin=(0, 2, 0), x_dir=(1, 0, 0), z_dir=(0, 1, 0))):
        with Locations((-5.767223107, -3.58751015)):
            Rectangle(SKETCH60_W, SKETCH60_H)
        with Locations((-5.767223107, -3.58751015)):
            Rectangle(SKETCH60_W_2, SKETCH60_H_2, mode=Mode.SUBTRACT)
    extrude(amount=-CUT_EXTRUDE_THIN3_DEPTH, mode=Mode.SUBTRACT)

    # Sketch61 → Cut-Extrude26 (cut)
    with BuildSketch(Plane.XY.offset(71.58751015)):
        with Locations((-5.767223107, 1)):
            Rectangle(SKETCH61_W, SKETCH61_H)
    extrude(amount=-CUT_EXTRUDE26_DEPTH, mode=Mode.SUBTRACT)


with BuildPart() as body_3_7:
    # Sketch51 → Boss-Extrude29 (new body)
    with BuildSketch(Plane(origin=(0, -6.726769048, 6.726769048), x_dir=(1, 0, 0), z_dir=(0, -0.7071067811865475, 0.7071067811865476))):
        with Locations((10.221556697, 8.692844153)):
            Rectangle(SKETCH51_W, SKETCH51_H)
    extrude(amount=BOSS_EXTRUDE29_DEPTH)


with BuildPart() as body_4_3:
    # Sketch51 → Boss-Extrude29 2 (new body)
    with BuildSketch(Plane(origin=(0, -6.726769048, 6.726769048), x_dir=(1, 0, 0), z_dir=(0, -0.7071067811865475, 0.7071067811865476))):
        with Locations((-21.756002911, 8.692844153)):
            Rectangle(SKETCH51_W, SKETCH51_H)
    extrude(amount=BOSS_EXTRUDE29_2_DEPTH)


with BuildPart() as body_5_2:
    # Sketch52 → Boss-Extrude30 (new body)
    with BuildSketch(Plane(origin=(0, 7.726769048, 7.726769048), x_dir=(1, 0, 0), z_dir=(0, 0.7071067811865476, 0.7071067811865475))):
        with Locations((10.221556697, -10.013088019)):
            Rectangle(SKETCH52_W, SKETCH52_H)
    extrude(amount=BOSS_EXTRUDE30_DEPTH)


with BuildPart() as body_6_2:
    # Sketch52 → Boss-Extrude30 2 (new body)
    with BuildSketch(Plane(origin=(0, 7.726769048, 7.726769048), x_dir=(1, 0, 0), z_dir=(0, 0.7071067811865476, 0.7071067811865475))):
        with Locations((-21.756002911, -10.013088019)):
            Rectangle(SKETCH52_W, SKETCH52_H)
    extrude(amount=BOSS_EXTRUDE30_2_DEPTH)


with BuildPart() as body_4_4:
    add(body_4_1.part)

    # Combine8: union body 3 7, body 4 3, body 5 2, body 6 2
    add(body_3_7.part)
    add(body_4_3.part)
    add(body_5_2.part)
    add(body_6_2.part)

    # Sketch53 → Boss-Extrude31 (add)
    with BuildSketch(Plane.XY.offset(11.293538096)):
        with Locations((-21.756002911, -11.82398317)):
            Rectangle(SKETCH53_W, SKETCH53_H)
        with Locations((10.221556697, -11.82398317)):
            Rectangle(SKETCH53_W, SKETCH53_H)
    extrude(amount=BOSS_EXTRUDE31_DEPTH)


with BuildPart() as body_3_8:
    # Boss-Extrude32: read off the stored shape, not the designer's step
    # Boss-Extrude32 outline → Boss-Extrude32 (new body)
    with BuildSketch(Plane.YZ.offset(BOSS_EXTRUDE32_START)):
        Polygon((-11.32398317, 11.293538096), (-2.16, 11.293538096), (-2.867106781, 12.000644877), (-2.574213562, 12.293538096), (-11.32398317, 12.293538096), align=None)
    extrude(amount=BOSS_EXTRUDE32_DEPTH)


with BuildPart() as body_4_4_1:
    # Boss-Extrude32 2 outline → Boss-Extrude32 2 (new body)
    with BuildSketch(Plane.YZ.offset(BOSS_EXTRUDE32_START_2)):
        Polygon((-11.32398317, 11.293538096), (-2.16, 11.293538096), (-2.867106781, 12.000644877), (-2.574213562, 12.293538096), (-11.32398317, 12.293538096), align=None)
    extrude(amount=BOSS_EXTRUDE32_2_DEPTH)


with BuildPart() as body_4_5:
    add(body_4_4.part)

    # Combine9: union body 4 4, body 3 8
    add(body_4_4_1.part)
    add(body_3_8.part)

    # Sketch55 → Boss-Extrude33 (add)
    with BuildSketch(Plane(origin=(0, -11.32398317, 0), x_dir=(1, 0, 0), z_dir=(0, 1, 0))):
        with Locations((10.221556697, -1.004386861)):
            Rectangle(SKETCH55_W, SKETCH55_H)
    extrude(amount=BOSS_EXTRUDE33_DEPTH)

    # Sketch56 → Cut-Extrude25 (cut)
    with BuildSketch(Plane.ZY.offset(-7.421556697)):
        with Locations((0.004386861, -5.661991585)):
            Rectangle(SKETCH56_W, SKETCH56_H)
    extrude(amount=-CUT_EXTRUDE25_DEPTH, mode=Mode.SUBTRACT)


with BuildPart() as cut_extrude28_tool:
    # Sketch62 → Cut-Extrude28 (new body)
    with BuildSketch(Plane(origin=(0, 3, 0), x_dir=(1, 0, 0), z_dir=(0, 1, 0))):
        with Locations((-5.767223107, 30.754931698)):
            Rectangle(SKETCH62_W, SKETCH62_H)
    extrude(amount=-CUT_EXTRUDE28_DEPTH)


with BuildPart() as body_4_6:
    add(body_4_5.part)

    # Cut-Extrude28: cut by cut_extrude28_tool
    add(cut_extrude28_tool.part, mode=Mode.SUBTRACT)

    # Sketch64 → Boss-Extrude35 (add)
    with BuildSketch(Plane(origin=(0, 3, 0), x_dir=(1, 0, 0), z_dir=(0, 1, 0))):
        with Locations((-5.767223107, 5.214512395)):
            Rectangle(SKETCH64_W, SKETCH64_H)
        with Locations((-5.767223107, 56.295351)):
            Rectangle(SKETCH64_W, SKETCH64_H)
    extrude(amount=-BOSS_EXTRUDE35_DEPTH)


with BuildPart() as body_3_6_1:
    add(body_3_6.part)

    # Cut-Extrude28: cut by cut_extrude28_tool
    add(cut_extrude28_tool.part, mode=Mode.SUBTRACT)

    # Sketch65 → Boss-Extrude37 (add)
    with BuildSketch(Plane.XZ):
        with Locations((-5.767223107, -5.214512395)):
            Rectangle(SKETCH65_W, SKETCH65_H)
        with Locations((-5.767223107, -56.295351)):
            Rectangle(SKETCH65_W, SKETCH65_H)
    extrude(amount=-BOSS_EXTRUDE37_DEPTH)


with BuildPart() as cut_extrude31_tool:
    # Sketch67 → Cut-Extrude31 (new body)
    with BuildSketch(Plane.XZ):
        with Locations((-5.767223107, -32.354931697)):
            Rectangle(SKETCH67_W, SKETCH67_H)
    extrude(amount=-CUT_EXTRUDE31_DEPTH)


with BuildPart() as body_4_7:
    add(body_4_6.part)

    # Cut-Extrude31: cut by cut_extrude31_tool
    add(cut_extrude31_tool.part, mode=Mode.SUBTRACT)

    # Sketch71 → Cut-Extrude32 (cut)
    with BuildSketch(Plane(origin=(0, 0, -5.254512395), x_dir=(-1, 0, 0), z_dir=(0, 0, -1))):
        with Locations((5.767223107, 2.5)):
            Rectangle(SKETCH71_W, SKETCH71_H)
    extrude(amount=-CUT_EXTRUDE32_DEPTH, mode=Mode.SUBTRACT)

    # Sketch72 → Boss-Extrude41 (add)
    with BuildSketch(Plane.XY.offset(-56.255351)):
        with Locations((-5.767223107, 2.5)):
            Rectangle(SKETCH72_W, SKETCH72_H)
    extrude(amount=BOSS_EXTRUDE41_DEPTH)

    # Sketch74 → Boss-Extrude43 (add)
    with BuildSketch(Plane(origin=(0, 0, -60.542924633), x_dir=(-1, 0, 0), z_dir=(0, 0, -1))):
        with Locations((5.767223107, 2.5)):
            Rectangle(SKETCH74_W, SKETCH74_H)
    extrude(amount=BOSS_EXTRUDE43_DEPTH)


with BuildPart() as body_3_6_2:
    add(body_3_6_1.part)

    # Cut-Extrude31: cut by cut_extrude31_tool
    add(cut_extrude31_tool.part, mode=Mode.SUBTRACT)

    # Sketch69 → Boss-Extrude39 (add)
    with BuildSketch(Plane(origin=(0, 0, -1.654512395), x_dir=(-1, 0, 0), z_dir=(0, 0, -1))):
        with Locations((6.105401472, 0.5)):
            Rectangle(SKETCH69_W, SKETCH69_H)
    extrude(amount=-BOSS_EXTRUDE39_DEPTH)

    # Sketch70 → Boss-Extrude40 (add)
    with BuildSketch(Plane.XY.offset(-63.055351)):
        with Locations((-5.767223107, 1)):
            Rectangle(SKETCH70_W, SKETCH70_H)
    extrude(amount=BOSS_EXTRUDE40_DEPTH)

    # Sketch73 → Cut-Extrude33 (cut)
    with BuildSketch(Plane.XY.offset(-62.055351)):
        with Locations((-5.767223107, 1)):
            Rectangle(SKETCH73_W, SKETCH73_H)
    extrude(amount=-CUT_EXTRUDE33_DEPTH, mode=Mode.SUBTRACT)


solid = Compound([body_4_7.part, body_3_6_2.part])
